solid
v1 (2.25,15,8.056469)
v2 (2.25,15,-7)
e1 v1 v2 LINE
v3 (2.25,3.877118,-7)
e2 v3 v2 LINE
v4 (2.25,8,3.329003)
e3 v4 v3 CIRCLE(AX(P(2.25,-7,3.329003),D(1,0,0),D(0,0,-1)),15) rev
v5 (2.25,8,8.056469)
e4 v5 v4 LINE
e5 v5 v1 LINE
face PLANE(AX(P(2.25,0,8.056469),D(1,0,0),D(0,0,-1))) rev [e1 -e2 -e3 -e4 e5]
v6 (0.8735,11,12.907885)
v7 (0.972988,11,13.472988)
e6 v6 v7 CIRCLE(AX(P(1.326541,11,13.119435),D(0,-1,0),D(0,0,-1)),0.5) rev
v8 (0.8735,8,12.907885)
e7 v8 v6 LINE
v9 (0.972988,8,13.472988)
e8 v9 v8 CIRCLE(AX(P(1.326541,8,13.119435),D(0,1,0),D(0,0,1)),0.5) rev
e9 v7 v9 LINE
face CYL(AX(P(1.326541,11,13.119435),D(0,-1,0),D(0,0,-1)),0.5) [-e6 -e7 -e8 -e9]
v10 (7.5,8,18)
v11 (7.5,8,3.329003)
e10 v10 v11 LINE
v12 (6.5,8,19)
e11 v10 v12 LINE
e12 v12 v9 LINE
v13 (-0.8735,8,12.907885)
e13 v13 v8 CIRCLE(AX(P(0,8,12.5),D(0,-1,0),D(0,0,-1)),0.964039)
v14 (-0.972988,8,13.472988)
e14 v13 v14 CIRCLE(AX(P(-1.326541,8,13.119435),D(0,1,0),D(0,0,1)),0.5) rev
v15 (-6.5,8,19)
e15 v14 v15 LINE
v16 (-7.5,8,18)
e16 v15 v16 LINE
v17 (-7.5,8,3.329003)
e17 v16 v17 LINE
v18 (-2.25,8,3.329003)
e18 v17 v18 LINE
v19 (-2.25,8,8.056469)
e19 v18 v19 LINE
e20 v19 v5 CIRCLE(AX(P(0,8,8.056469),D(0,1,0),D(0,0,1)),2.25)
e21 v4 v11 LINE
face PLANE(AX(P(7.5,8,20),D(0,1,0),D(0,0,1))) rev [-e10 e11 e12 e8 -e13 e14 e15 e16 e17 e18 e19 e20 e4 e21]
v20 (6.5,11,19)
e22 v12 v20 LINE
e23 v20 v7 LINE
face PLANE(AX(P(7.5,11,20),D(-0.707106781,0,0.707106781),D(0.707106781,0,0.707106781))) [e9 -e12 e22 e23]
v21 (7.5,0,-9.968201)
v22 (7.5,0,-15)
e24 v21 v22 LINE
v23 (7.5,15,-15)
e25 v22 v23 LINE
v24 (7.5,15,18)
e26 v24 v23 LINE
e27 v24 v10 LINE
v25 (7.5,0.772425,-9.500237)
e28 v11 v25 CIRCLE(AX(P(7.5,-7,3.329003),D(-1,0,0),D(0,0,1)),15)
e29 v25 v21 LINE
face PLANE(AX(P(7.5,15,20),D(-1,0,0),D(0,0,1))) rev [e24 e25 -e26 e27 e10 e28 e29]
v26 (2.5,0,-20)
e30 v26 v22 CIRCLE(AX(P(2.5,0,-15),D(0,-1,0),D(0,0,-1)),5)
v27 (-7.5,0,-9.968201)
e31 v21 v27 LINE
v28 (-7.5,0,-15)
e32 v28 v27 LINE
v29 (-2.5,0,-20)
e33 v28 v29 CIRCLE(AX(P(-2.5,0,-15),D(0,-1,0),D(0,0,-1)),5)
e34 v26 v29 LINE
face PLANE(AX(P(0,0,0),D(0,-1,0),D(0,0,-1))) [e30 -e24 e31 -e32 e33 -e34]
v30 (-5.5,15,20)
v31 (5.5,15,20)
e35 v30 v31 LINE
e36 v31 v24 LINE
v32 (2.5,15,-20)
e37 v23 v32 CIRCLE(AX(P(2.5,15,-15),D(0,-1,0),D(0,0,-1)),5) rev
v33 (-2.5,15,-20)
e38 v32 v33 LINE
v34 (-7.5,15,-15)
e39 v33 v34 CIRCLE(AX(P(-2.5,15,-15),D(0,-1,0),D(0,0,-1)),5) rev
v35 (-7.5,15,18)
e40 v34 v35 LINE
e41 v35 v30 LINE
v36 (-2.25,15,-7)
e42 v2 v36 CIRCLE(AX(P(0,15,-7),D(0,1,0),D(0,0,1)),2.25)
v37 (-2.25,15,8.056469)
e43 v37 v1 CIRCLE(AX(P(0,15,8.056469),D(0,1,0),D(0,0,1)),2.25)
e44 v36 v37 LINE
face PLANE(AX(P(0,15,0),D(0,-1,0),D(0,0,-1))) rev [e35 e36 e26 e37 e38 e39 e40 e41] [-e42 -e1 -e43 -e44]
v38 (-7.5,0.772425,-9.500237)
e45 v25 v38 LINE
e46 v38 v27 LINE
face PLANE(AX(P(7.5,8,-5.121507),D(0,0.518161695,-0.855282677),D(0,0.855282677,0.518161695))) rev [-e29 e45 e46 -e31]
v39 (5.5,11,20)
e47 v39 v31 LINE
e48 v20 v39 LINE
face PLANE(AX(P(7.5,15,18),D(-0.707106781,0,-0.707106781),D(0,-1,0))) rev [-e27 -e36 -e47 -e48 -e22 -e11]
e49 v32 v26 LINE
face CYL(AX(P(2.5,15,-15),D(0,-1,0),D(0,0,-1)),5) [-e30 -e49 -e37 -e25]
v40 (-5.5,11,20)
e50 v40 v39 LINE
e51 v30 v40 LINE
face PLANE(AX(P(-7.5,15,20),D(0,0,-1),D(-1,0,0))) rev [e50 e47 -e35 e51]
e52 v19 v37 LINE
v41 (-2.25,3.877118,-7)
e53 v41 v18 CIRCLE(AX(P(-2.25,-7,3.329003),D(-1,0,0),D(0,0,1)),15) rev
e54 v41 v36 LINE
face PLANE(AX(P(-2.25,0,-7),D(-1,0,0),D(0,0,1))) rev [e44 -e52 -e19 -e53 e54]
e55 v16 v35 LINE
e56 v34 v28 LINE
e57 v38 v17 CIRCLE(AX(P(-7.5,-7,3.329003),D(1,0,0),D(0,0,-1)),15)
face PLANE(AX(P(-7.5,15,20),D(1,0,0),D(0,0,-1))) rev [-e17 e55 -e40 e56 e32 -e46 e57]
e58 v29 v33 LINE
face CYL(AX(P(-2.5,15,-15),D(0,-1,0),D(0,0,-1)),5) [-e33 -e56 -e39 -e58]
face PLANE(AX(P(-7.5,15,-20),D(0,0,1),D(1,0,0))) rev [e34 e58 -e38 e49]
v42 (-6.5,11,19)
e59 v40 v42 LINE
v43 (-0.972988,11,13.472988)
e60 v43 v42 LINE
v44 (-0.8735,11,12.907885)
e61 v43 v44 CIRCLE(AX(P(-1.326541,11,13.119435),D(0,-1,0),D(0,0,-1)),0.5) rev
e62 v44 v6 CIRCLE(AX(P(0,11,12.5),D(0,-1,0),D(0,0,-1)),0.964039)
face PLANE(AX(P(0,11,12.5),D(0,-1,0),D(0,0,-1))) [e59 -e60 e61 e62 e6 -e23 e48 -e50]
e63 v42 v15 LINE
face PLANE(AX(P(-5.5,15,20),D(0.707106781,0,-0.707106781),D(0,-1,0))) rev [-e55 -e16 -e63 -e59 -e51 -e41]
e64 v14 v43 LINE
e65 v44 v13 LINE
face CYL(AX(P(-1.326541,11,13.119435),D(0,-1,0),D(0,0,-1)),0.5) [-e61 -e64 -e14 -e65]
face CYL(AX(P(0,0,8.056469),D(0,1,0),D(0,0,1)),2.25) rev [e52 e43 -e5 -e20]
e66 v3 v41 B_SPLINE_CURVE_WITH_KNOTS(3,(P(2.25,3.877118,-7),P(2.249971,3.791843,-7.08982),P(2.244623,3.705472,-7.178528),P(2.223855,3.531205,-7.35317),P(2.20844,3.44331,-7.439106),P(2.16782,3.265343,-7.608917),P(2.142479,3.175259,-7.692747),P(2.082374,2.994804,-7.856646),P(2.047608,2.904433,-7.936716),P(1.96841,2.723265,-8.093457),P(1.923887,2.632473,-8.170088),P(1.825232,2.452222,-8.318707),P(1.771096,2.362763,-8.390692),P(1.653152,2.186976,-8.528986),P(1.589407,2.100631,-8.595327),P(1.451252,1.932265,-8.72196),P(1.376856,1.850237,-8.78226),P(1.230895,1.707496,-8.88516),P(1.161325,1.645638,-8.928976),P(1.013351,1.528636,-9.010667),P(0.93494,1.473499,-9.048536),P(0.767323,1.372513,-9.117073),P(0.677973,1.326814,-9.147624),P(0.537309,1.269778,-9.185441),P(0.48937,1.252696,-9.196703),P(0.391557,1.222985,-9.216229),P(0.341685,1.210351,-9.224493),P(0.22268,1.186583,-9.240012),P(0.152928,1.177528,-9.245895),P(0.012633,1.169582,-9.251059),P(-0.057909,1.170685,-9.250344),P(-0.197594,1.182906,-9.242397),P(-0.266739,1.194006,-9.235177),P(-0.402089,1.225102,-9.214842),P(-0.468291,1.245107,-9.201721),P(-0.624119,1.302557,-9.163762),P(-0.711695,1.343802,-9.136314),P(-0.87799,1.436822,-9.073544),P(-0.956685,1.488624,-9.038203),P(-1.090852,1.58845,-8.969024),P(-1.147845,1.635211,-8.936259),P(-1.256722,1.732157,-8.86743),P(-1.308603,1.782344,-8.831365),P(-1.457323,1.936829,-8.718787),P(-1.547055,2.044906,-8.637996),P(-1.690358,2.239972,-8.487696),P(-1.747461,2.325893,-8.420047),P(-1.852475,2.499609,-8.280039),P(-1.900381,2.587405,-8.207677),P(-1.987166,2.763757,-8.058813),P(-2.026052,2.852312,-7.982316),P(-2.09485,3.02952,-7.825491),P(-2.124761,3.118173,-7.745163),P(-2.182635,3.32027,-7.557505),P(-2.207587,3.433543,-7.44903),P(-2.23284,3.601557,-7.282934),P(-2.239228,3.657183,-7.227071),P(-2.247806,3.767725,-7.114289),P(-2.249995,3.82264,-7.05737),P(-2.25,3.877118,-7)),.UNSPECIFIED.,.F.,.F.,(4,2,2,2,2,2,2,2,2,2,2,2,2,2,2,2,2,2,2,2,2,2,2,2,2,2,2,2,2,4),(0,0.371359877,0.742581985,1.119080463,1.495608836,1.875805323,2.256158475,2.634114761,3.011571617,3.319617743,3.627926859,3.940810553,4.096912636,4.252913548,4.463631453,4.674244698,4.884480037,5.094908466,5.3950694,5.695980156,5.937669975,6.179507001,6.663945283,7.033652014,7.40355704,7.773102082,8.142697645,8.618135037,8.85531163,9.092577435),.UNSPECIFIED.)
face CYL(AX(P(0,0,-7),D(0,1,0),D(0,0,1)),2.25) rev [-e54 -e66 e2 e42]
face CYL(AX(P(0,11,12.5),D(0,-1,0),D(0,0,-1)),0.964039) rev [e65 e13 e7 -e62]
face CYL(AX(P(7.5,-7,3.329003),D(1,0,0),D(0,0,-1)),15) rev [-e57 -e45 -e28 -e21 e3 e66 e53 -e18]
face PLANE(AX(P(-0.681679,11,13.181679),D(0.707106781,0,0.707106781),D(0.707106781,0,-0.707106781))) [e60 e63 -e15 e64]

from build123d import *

# Parameters (mm, degrees)
SKETCH1_W           = 15
SKETCH1_H           = 40
BOSS_EXTRUDE1_DEPTH = 15
CUT_EXTRUDE1_DEPTH  = 30.154759474
FILLET1_R           = 15
CUT_EXTRUDE2_DEPTH  = 3
FILLET2_R           = 0.5
FILLET4_R           = 0.5
CHAMFER1_SIZE       = 2
FILLET6_R           = 5
CUT_EXTRUDE3_DEPTH  = 27.100766272


with BuildPart() as part:
    # Sketch1 → Boss-Extrude1 (new body)
    with BuildSketch(Plane(origin=(0, 0, 0), x_dir=(1, 0, 0), z_dir=(0, 1, 0))):
        Rectangle(SKETCH1_W, SKETCH1_H)
    extrude(amount=BOSS_EXTRUDE1_DEPTH)

    # Sketch3 → Cut-Extrude1 (cut, through all)
    with BuildSketch(Plane.ZY.offset(7.5)):
        Polygon((20, 0), (20, 8), (-5.121506718, 8), (-9.96820088, 0), align=None)
    extrude(amount=-CUT_EXTRUDE1_DEPTH, mode=Mode.SUBTRACT)

    # Fillet1
    fillet1_edges = [part.edges().sort_by_distance(p)[0] for p in [
        (0, 8, -5.121506718),
    ]]
    fillet(fillet1_edges, radius=FILLET1_R)

    # Sketch5 → Cut-Extrude2 (cut)
    with BuildSketch(Plane.XZ.offset(-8)):
        with BuildLine():
            Line((7.5, 20), (0.681678783, 13.181678783))
            ThreePointArc((0.681678783, 13.181678783), (0, 11.53596062), (-0.681678783, 13.181678783))
            Line((-0.681678783, 13.181678783), (-7.5, 20))
            Line((-7.5, 20), (7.5, 20))
        make_face()
    extrude(amount=-CUT_EXTRUDE2_DEPTH, mode=Mode.SUBTRACT)

    # Fillet2
    fillet2_edges = [part.edges().sort_by_distance(p)[0] for p in [
        (0.681678783, 9.5, 13.181678783),
        (-0.681678783, 9.5, 13.181678783),
    ]]
    fillet(fillet2_edges, radius=FILLET2_R)

    # Fillet4
    fillet4_edges = [part.edges().sort_by_distance(p)[0] for p in [
        (-7.5, 9.5, 20),
        (7.5, 9.5, 20),
    ]]
    fillet(fillet4_edges, radius=FILLET4_R)

    # Chamfer1
    # the kernel refuses this chamfer: 2 mm, written as the material it takes off along each edge
    with BuildSketch(Plane(origin=(7.5, 5.856634024, 20), x_dir=(0.02749587661058651, 0, -0.9996219169112968), z_dir=(0, 1, 0))) as chamfer1_piece_1:
        Polygon((CHAMFER1_SIZE * 0.999621916911, CHAMFER1_SIZE * 0.0274958766106), (-CHAMFER1_SIZE * 0.0274958766106, CHAMFER1_SIZE * 0.999621916911), (0, 0), align=None)
    extrude(amount=14.286731952, mode=Mode.SUBTRACT)
    with BuildSketch(Plane(origin=(-7.5, 5.856634024, 20), x_dir=(-0.02749587661058651, 0, -0.9996219169112968), z_dir=(0, 1, 0))) as chamfer1_piece_2:
        Polygon((CHAMFER1_SIZE * 0.999621916911, -CHAMFER1_SIZE * 0.0274958766106), (-CHAMFER1_SIZE * 0.0274958766106, -CHAMFER1_SIZE * 0.999621916911), (0, 0), align=None)
    extrude(amount=14.286731952, mode=Mode.SUBTRACT)

    # Fillet6
    fillet6_edges = [part.edges().sort_by_distance(p)[0] for p in [
        (-7.5, 7.5, -20),
        (7.5, 7.5, -20),
    ]]
    fillet(fillet6_edges, radius=FILLET6_R)

    # Sketch6 → Cut-Extrude3 (cut, through all)
    with BuildSketch(Plane(origin=(0, 15, 0), x_dir=(1, 0, 0), z_dir=(0, 1, 0))):
        with BuildLine():
            Line((-2.25, 7), (-2.25, -8.056468678))
            ThreePointArc((-2.25, -8.056468678), (0, -10.306468678), (2.25, -8.056468678))
            Line((2.25, -8.056468678), (2.25, 7))
            ThreePointArc((2.25, 7), (0, 9.25), (-2.25, 7))
        make_face()
    extrude(amount=-CUT_EXTRUDE3_DEPTH, mode=Mode.SUBTRACT)


solid = part.part
